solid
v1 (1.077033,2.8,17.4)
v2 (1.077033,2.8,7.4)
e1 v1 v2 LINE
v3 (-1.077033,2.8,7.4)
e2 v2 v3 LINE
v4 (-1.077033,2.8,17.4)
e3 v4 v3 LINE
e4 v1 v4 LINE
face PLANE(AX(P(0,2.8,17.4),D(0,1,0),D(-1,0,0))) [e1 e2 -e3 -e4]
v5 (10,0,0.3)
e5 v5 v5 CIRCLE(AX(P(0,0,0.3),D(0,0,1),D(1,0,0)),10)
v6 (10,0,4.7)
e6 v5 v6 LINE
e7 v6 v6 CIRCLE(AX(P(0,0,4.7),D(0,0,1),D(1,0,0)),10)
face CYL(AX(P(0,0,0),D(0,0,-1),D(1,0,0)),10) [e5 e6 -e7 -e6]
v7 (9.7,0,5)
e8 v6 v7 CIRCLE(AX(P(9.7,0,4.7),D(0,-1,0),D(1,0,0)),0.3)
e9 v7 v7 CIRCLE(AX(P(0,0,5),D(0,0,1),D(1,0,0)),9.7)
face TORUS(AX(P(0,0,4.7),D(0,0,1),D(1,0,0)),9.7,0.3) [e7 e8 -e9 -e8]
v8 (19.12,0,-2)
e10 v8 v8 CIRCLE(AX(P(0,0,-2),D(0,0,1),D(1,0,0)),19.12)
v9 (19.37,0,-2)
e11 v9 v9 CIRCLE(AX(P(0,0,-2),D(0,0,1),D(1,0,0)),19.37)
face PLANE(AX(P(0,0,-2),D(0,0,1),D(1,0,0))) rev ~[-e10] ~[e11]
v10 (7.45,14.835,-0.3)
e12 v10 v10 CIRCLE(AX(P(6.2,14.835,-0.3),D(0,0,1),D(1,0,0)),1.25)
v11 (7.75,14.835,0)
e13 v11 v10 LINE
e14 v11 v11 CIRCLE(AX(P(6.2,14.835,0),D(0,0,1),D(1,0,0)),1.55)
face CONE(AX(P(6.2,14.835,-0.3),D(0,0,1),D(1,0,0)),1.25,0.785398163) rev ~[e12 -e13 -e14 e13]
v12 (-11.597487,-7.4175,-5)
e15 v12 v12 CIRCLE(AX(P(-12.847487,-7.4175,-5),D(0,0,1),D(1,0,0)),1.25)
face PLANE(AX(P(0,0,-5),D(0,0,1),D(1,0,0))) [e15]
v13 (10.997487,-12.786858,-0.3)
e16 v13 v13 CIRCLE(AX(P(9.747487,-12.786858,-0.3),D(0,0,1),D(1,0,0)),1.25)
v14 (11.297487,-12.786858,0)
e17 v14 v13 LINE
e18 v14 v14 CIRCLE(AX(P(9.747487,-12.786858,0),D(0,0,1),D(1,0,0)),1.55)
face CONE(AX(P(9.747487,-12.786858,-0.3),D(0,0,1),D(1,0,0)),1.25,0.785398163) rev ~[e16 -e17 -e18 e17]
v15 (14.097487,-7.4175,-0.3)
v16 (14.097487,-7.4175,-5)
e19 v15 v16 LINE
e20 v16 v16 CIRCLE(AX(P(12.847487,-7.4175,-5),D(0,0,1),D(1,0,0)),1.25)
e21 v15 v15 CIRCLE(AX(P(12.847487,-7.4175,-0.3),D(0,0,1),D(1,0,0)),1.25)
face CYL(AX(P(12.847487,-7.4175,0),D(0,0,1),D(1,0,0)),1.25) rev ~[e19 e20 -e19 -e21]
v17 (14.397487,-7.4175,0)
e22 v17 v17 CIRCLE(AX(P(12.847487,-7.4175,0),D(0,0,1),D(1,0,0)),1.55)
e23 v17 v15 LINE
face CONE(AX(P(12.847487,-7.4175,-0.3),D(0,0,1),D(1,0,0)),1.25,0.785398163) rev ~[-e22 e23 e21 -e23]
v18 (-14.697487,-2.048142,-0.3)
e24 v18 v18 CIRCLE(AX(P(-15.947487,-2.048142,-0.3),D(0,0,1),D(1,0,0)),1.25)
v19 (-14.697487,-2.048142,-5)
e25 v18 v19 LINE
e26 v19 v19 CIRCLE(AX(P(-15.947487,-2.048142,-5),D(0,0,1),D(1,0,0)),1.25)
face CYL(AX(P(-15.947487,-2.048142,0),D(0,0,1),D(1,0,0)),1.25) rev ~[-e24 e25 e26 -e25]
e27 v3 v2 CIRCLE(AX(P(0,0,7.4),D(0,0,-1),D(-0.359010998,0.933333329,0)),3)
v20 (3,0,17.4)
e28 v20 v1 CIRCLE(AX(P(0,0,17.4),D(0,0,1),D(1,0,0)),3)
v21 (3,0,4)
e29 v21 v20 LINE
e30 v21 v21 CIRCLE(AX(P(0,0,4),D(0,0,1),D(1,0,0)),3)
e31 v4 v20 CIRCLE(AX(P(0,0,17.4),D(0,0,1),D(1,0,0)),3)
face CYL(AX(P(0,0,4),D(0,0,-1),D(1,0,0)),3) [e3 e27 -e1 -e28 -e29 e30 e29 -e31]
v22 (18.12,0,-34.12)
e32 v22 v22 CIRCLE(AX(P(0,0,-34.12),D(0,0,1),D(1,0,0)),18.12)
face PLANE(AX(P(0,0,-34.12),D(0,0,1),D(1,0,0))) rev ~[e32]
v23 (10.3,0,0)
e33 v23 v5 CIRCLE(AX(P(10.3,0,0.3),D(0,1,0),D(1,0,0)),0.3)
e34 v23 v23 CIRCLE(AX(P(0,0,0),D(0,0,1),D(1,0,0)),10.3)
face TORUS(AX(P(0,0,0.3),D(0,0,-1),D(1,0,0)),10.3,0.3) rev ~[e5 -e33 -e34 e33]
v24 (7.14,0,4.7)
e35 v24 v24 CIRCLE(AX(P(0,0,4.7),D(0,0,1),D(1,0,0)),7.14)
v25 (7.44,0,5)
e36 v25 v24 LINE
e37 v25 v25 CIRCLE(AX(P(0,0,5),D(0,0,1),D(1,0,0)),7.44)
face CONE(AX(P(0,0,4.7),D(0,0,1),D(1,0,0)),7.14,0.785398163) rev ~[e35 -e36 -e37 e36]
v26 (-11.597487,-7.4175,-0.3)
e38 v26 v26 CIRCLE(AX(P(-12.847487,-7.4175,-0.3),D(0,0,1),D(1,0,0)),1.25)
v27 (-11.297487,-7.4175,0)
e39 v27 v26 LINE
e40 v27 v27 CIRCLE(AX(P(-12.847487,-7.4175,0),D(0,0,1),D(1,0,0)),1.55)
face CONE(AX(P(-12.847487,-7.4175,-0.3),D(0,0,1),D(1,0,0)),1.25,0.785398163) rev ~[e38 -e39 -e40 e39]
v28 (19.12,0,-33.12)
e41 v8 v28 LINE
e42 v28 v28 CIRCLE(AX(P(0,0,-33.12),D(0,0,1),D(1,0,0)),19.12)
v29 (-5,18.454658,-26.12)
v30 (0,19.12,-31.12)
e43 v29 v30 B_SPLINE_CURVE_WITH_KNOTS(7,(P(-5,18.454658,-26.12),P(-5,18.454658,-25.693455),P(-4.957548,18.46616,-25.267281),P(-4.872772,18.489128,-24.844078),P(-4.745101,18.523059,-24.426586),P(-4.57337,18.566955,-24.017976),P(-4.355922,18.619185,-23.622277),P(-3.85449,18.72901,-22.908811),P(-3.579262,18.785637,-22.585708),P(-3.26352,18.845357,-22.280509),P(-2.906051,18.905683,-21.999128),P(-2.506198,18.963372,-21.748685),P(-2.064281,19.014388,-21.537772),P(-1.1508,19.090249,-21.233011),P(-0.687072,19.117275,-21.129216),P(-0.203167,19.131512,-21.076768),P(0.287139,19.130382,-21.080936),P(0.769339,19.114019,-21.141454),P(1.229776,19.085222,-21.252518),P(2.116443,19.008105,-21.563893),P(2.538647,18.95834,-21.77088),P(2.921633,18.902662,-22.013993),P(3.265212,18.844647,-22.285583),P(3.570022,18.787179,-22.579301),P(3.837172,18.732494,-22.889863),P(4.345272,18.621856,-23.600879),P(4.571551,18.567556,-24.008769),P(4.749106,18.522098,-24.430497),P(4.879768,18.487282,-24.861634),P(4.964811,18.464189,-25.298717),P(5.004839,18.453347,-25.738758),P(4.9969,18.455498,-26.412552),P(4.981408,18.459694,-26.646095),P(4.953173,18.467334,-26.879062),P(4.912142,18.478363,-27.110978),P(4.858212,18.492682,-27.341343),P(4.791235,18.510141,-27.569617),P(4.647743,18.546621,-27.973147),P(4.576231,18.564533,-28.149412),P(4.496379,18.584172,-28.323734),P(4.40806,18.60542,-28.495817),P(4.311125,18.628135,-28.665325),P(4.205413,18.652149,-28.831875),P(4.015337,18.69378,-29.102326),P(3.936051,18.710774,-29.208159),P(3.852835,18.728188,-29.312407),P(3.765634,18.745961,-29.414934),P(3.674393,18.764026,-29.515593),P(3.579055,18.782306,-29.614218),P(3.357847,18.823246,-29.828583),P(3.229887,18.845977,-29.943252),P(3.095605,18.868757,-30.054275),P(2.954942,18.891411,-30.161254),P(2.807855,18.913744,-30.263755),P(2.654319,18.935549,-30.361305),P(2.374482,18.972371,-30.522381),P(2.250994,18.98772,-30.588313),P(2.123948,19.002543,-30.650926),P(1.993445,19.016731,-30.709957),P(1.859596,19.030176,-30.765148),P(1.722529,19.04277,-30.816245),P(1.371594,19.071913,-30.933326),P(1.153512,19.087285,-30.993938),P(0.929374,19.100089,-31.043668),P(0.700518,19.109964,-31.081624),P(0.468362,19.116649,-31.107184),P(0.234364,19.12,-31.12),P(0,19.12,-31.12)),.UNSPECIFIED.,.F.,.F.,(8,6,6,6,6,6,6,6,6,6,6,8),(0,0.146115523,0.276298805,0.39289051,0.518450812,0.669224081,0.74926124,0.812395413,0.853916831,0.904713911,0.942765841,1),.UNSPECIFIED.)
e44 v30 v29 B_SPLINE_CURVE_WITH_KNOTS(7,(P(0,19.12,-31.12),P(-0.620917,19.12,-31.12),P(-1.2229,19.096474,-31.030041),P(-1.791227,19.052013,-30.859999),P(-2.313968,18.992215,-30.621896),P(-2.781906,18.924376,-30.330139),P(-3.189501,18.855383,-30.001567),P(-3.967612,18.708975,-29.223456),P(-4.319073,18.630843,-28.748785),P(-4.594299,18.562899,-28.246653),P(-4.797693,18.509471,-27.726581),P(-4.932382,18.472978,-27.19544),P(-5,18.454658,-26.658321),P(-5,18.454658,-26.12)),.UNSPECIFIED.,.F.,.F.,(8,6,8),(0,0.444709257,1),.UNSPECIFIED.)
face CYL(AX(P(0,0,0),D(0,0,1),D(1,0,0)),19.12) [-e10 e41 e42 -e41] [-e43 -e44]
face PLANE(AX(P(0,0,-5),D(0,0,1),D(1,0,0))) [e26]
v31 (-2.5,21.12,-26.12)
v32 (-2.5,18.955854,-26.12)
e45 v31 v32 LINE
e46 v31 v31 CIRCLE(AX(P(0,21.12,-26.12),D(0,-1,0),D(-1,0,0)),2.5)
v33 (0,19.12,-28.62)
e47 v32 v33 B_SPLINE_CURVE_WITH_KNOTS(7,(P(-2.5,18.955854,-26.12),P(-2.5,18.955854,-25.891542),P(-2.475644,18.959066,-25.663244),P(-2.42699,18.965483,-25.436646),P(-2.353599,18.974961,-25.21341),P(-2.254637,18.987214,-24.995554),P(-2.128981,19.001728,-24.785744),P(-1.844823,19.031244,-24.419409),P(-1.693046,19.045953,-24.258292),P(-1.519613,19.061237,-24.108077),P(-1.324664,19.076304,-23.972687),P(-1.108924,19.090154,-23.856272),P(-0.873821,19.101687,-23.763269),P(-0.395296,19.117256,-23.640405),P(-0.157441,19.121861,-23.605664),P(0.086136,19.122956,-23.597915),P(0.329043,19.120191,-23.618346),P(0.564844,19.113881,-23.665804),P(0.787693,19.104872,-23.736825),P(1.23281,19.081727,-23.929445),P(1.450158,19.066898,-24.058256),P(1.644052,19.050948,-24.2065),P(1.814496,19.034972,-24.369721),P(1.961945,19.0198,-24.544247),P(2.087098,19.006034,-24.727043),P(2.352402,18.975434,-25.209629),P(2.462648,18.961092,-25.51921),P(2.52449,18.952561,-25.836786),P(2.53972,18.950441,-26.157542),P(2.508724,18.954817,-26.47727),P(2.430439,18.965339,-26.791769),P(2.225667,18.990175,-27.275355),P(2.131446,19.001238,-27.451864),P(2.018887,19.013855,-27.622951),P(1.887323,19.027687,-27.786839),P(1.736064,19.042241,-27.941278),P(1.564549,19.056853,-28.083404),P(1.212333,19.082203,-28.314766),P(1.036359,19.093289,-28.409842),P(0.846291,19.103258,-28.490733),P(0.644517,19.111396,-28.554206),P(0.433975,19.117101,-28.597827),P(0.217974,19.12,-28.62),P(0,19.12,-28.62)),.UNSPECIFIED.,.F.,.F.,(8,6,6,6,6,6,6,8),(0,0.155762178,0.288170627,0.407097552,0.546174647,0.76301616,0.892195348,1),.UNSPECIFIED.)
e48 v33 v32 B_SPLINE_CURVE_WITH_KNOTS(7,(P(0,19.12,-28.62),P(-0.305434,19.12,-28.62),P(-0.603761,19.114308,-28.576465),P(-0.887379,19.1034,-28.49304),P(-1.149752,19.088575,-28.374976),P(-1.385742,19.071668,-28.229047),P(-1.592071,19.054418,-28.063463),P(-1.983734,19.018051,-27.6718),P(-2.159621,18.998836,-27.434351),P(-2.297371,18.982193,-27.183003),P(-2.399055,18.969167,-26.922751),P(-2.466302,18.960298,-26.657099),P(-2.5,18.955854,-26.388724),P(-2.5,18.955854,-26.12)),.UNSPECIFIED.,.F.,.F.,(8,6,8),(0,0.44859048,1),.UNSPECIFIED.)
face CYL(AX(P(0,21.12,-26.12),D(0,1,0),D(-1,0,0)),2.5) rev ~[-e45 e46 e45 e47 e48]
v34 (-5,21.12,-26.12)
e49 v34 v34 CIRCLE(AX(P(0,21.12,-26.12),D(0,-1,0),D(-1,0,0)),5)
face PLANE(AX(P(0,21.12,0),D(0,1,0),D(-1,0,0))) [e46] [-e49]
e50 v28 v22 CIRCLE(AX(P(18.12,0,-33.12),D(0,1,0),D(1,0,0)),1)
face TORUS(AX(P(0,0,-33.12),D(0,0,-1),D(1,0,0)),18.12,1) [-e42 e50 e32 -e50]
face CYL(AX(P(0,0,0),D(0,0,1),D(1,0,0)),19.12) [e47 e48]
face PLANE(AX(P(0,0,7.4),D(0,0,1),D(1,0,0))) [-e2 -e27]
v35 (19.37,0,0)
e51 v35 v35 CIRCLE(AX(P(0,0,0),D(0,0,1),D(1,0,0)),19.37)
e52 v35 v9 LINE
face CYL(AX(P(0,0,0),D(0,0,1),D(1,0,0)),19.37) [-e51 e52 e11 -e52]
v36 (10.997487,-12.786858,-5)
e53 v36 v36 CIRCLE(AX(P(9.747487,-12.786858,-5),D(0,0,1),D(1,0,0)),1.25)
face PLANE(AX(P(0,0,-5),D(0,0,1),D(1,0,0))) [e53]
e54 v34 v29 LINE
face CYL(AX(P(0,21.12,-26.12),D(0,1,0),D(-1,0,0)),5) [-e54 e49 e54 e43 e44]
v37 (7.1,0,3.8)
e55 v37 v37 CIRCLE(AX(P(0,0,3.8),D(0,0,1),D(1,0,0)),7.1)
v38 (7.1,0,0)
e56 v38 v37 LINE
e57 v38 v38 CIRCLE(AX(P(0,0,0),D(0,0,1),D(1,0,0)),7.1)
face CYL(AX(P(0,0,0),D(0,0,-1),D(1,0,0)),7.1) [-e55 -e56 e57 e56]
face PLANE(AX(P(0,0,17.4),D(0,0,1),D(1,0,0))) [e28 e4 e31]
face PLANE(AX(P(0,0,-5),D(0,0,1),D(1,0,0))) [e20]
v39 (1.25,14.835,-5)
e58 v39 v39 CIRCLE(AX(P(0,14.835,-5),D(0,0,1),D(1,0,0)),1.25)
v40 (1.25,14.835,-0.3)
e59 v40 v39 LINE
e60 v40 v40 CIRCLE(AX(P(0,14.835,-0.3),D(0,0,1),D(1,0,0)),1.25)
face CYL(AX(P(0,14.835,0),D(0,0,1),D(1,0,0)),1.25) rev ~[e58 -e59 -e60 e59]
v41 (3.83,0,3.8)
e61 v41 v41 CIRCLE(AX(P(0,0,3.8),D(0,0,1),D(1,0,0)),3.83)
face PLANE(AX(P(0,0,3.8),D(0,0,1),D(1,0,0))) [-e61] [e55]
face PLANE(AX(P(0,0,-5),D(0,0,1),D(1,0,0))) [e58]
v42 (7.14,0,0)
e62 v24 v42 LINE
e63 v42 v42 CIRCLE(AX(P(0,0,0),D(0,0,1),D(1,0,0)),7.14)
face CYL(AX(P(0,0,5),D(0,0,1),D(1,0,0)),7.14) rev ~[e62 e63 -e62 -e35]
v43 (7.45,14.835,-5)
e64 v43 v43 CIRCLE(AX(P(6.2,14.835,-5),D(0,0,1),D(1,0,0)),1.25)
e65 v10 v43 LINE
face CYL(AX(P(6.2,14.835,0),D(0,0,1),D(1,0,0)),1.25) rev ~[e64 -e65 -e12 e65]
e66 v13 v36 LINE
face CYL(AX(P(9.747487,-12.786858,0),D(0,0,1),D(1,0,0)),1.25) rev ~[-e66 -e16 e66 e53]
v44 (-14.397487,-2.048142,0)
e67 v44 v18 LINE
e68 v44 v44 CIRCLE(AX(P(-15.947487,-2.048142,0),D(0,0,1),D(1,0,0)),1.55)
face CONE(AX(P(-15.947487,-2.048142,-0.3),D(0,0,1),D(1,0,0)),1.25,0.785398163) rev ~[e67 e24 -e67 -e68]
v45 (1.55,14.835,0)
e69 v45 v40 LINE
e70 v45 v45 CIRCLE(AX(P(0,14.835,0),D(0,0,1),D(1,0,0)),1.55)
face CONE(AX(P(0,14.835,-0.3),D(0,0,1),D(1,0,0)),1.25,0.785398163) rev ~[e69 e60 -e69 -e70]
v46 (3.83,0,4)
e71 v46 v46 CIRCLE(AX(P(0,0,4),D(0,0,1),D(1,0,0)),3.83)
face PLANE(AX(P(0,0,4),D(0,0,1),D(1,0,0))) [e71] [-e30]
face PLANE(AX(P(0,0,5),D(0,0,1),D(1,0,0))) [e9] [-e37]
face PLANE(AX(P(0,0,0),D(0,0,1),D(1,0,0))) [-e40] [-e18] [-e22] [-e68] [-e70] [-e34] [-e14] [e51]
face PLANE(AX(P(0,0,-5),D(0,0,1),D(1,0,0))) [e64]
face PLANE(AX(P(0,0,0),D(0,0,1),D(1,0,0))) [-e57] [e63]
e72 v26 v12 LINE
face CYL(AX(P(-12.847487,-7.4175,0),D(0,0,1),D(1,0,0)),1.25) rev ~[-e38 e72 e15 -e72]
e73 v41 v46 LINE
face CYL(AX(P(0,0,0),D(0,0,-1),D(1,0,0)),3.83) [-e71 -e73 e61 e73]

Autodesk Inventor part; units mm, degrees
ref_plane "YZ Plane" through (0, 0, 0) normal (1, 0, 0) x (0, 1, 0)
ref_plane "XY Plane" through (0, 0, 0) normal (0, 0, 1) x (1, 0, 0)
sketch "Sketch1" plane through (0, 0, 0) normal (0, 0, 1) x (1, 0, 0)
  circle A0 centre (0, 0) radius 19.12
extrude "Extrusion1" add sketch "Sketch1" against normal blind 34.12
fillet "Fillet1" radius 1 1 edges at (-19.12, 0, -34.12)
sketch "Sketch2" plane through (0, 0, 0) normal (0, 0, 1) x (1, 0, 0)
  circle A0 centre (0, 0) radius 19.12 projected
  circle A1 centre (0, 0) radius 19.37
extrude "Extrusion2" add sketch "Sketch2" against normal blind 2
sketch "Sketch3" plane through (0, 0, 0) normal (0, 0, 1) x (1, 0, 0)
  circle A0 centre (0, 0) radius 19.37 projected
  circle A1 centre (0, 0) radius 10
extrude "Extrusion3" add sketch "Sketch3" along normal blind 5 contours A1
sketch "Sketch4" plane through (0, 0, 5) normal (0, 0, 1) x (1, 0, 0)
  circle A0 centre (0, 0) radius 10 projected
  circle A1 centre (0, 0) radius 7.14
extrude "Extrusion4" cut sketch "Sketch4" against normal blind 5 contours A1
sketch "Sketch5" plane through (0, 0, 0) normal (0, 0, 1) x (1, 0, 0)
  circle A0 centre (0, 0) radius 7.14 projected
  circle A1 centre (0, 0) radius 3.83
extrude "Extrusion5" add sketch "Sketch5" along normal blind 4 contours A1
sketch "Sketch6" plane through (0, 0, 4) normal (0, 0, 1) x (1, 0, 0)
  circle A0 centre (0, 0) radius 3.83 projected
  circle A1 centre (0, 0) radius 3
extrude "Extrusion6" add sketch "Sketch6" along normal blind 13.4 contours A1
sketch "Sketch7" plane through (0, 0, 17.4) normal (0, 0, 1) x (1, 0, 0)
  circle A0 centre (0, 0) radius 3
  line L0 (0, 2.8) -> (1.077033, 2.8)
  line L1 (0, 2.8) -> (-1.077033, 2.8)
  arc A1 (1.077033, 2.8) -> (0, 3) centre (0, 0) ccw
  arc A2 (0, 3) -> (-1.077033, 2.8) centre (0, 0) ccw
extrude "Extrusion7" cut sketch "Sketch7" against normal blind 10 contours L0 L1 A0 picked at (-0.601378, 2.836851)
fillet "Fillet2" radius 0.3 2 edges at (-10, 0, 5) (-10, 0, 0)
chamfer "Chamfer1" distance 0.3 angle 45 1 edges at (-7.14, 0, 5)
sketch "Sketch8" plane through (0, 0, 0) normal (0, 0, 1) x (1, 0, 0)
  circle A0 centre (0, 0) radius 3.83 projected
  circle A1 centre (0, 0) radius 7.14 projected
  circle A2 centre (0, 0) radius 7.1
sketch "Sketch8 outline for Extrusion8" plane through (0, 0, 0) normal (0, 0, 1) x (1, 0, 0)
  circle A0 centre (0, 0) radius 7.1
  circle A1 centre (0, 0) radius 3.83
extrude "Extrusion8" add sketch "Sketch8 outline for Extrusion8" along normal blind 3.8
sketch "Sketch9" plane through (0, 0, 0) normal (0, 0, 1) x (1, 0, 0)
  circle A0 centre (0, 0) radius 19.37
  circle A1 centre (0, 14.835) radius 1.25
  circle A2 centre (-12.847487, -7.4175) radius 1.25
  circle A3 centre (12.847487, -7.4175) radius 1.25
  circle A4 centre (6.2, 14.835) radius 1.25
  circle A5 centre (-15.947487, -2.048142) radius 1.25
  circle A6 centre (9.747487, -12.786858) radius 1.25
  dimension "d32" = 360
  dimension "d38" = 360
extrude "Extrusion9" cut sketch "Sketch9" against normal blind 5 contours A1 | A2 | A3 | A4 | A5 | A6
thread "Thread1" size "M3x0.5" class "6H" standard "ANSI Metric M Profile" full length
thread "Thread2" size "M3x0.5" class "6H" standard "ANSI Metric M Profile" full length
thread "Thread3" size "M3x0.5" class "6H" standard "ANSI Metric M Profile" full length
thread "Thread4" size "M3x0.5" class "6H" standard "ANSI Metric M Profile" full length
thread "Thread5" size "M3x0.5" class "6H" standard "ANSI Metric M Profile" full length
thread "Thread6" size "M3x0.5" class "6H" standard "ANSI Metric M Profile" full length
chamfer "Chamfer2" distance 0.3 angle 45 6 edges at (-1.25, 14.835, 0) (4.95, 14.835, 0) (11.5975, -7.4175, 0) (8.4975, -12.7869, 0) (-14.0975, -7.4175, 0) (-17.1975, -2.0481, 0)
ref_plane "Work Plane2" through (0, 21.12, 0) normal (0, 1, 0) x (-1, 0, 0)
ref_plane "Work Plane1" through (0, 19.12, 0) normal (0, 1, 0) x (-1, 0, 0)
sketch "Sketch10" plane through (0, 21.12, 0) normal (0, 1, 0) x (-1, 0, 0)
  line L0 (18.12, -34.12) -> (-18.12, -34.12) projected
  line L1 (-19.12, -33.12) -> (19.12, -33.12) projected
  line L2 (0, -33.12) -> (0, -26.12)
  circle A0 centre (0, -26.12) radius 5
  circle A1 centre (0, -26.12) radius 2.5
  point P0 (0, 0)
extrude "Extrusion10" add sketch "Sketch10" against normal blind 5
properties part number "Rotary Encoder"
